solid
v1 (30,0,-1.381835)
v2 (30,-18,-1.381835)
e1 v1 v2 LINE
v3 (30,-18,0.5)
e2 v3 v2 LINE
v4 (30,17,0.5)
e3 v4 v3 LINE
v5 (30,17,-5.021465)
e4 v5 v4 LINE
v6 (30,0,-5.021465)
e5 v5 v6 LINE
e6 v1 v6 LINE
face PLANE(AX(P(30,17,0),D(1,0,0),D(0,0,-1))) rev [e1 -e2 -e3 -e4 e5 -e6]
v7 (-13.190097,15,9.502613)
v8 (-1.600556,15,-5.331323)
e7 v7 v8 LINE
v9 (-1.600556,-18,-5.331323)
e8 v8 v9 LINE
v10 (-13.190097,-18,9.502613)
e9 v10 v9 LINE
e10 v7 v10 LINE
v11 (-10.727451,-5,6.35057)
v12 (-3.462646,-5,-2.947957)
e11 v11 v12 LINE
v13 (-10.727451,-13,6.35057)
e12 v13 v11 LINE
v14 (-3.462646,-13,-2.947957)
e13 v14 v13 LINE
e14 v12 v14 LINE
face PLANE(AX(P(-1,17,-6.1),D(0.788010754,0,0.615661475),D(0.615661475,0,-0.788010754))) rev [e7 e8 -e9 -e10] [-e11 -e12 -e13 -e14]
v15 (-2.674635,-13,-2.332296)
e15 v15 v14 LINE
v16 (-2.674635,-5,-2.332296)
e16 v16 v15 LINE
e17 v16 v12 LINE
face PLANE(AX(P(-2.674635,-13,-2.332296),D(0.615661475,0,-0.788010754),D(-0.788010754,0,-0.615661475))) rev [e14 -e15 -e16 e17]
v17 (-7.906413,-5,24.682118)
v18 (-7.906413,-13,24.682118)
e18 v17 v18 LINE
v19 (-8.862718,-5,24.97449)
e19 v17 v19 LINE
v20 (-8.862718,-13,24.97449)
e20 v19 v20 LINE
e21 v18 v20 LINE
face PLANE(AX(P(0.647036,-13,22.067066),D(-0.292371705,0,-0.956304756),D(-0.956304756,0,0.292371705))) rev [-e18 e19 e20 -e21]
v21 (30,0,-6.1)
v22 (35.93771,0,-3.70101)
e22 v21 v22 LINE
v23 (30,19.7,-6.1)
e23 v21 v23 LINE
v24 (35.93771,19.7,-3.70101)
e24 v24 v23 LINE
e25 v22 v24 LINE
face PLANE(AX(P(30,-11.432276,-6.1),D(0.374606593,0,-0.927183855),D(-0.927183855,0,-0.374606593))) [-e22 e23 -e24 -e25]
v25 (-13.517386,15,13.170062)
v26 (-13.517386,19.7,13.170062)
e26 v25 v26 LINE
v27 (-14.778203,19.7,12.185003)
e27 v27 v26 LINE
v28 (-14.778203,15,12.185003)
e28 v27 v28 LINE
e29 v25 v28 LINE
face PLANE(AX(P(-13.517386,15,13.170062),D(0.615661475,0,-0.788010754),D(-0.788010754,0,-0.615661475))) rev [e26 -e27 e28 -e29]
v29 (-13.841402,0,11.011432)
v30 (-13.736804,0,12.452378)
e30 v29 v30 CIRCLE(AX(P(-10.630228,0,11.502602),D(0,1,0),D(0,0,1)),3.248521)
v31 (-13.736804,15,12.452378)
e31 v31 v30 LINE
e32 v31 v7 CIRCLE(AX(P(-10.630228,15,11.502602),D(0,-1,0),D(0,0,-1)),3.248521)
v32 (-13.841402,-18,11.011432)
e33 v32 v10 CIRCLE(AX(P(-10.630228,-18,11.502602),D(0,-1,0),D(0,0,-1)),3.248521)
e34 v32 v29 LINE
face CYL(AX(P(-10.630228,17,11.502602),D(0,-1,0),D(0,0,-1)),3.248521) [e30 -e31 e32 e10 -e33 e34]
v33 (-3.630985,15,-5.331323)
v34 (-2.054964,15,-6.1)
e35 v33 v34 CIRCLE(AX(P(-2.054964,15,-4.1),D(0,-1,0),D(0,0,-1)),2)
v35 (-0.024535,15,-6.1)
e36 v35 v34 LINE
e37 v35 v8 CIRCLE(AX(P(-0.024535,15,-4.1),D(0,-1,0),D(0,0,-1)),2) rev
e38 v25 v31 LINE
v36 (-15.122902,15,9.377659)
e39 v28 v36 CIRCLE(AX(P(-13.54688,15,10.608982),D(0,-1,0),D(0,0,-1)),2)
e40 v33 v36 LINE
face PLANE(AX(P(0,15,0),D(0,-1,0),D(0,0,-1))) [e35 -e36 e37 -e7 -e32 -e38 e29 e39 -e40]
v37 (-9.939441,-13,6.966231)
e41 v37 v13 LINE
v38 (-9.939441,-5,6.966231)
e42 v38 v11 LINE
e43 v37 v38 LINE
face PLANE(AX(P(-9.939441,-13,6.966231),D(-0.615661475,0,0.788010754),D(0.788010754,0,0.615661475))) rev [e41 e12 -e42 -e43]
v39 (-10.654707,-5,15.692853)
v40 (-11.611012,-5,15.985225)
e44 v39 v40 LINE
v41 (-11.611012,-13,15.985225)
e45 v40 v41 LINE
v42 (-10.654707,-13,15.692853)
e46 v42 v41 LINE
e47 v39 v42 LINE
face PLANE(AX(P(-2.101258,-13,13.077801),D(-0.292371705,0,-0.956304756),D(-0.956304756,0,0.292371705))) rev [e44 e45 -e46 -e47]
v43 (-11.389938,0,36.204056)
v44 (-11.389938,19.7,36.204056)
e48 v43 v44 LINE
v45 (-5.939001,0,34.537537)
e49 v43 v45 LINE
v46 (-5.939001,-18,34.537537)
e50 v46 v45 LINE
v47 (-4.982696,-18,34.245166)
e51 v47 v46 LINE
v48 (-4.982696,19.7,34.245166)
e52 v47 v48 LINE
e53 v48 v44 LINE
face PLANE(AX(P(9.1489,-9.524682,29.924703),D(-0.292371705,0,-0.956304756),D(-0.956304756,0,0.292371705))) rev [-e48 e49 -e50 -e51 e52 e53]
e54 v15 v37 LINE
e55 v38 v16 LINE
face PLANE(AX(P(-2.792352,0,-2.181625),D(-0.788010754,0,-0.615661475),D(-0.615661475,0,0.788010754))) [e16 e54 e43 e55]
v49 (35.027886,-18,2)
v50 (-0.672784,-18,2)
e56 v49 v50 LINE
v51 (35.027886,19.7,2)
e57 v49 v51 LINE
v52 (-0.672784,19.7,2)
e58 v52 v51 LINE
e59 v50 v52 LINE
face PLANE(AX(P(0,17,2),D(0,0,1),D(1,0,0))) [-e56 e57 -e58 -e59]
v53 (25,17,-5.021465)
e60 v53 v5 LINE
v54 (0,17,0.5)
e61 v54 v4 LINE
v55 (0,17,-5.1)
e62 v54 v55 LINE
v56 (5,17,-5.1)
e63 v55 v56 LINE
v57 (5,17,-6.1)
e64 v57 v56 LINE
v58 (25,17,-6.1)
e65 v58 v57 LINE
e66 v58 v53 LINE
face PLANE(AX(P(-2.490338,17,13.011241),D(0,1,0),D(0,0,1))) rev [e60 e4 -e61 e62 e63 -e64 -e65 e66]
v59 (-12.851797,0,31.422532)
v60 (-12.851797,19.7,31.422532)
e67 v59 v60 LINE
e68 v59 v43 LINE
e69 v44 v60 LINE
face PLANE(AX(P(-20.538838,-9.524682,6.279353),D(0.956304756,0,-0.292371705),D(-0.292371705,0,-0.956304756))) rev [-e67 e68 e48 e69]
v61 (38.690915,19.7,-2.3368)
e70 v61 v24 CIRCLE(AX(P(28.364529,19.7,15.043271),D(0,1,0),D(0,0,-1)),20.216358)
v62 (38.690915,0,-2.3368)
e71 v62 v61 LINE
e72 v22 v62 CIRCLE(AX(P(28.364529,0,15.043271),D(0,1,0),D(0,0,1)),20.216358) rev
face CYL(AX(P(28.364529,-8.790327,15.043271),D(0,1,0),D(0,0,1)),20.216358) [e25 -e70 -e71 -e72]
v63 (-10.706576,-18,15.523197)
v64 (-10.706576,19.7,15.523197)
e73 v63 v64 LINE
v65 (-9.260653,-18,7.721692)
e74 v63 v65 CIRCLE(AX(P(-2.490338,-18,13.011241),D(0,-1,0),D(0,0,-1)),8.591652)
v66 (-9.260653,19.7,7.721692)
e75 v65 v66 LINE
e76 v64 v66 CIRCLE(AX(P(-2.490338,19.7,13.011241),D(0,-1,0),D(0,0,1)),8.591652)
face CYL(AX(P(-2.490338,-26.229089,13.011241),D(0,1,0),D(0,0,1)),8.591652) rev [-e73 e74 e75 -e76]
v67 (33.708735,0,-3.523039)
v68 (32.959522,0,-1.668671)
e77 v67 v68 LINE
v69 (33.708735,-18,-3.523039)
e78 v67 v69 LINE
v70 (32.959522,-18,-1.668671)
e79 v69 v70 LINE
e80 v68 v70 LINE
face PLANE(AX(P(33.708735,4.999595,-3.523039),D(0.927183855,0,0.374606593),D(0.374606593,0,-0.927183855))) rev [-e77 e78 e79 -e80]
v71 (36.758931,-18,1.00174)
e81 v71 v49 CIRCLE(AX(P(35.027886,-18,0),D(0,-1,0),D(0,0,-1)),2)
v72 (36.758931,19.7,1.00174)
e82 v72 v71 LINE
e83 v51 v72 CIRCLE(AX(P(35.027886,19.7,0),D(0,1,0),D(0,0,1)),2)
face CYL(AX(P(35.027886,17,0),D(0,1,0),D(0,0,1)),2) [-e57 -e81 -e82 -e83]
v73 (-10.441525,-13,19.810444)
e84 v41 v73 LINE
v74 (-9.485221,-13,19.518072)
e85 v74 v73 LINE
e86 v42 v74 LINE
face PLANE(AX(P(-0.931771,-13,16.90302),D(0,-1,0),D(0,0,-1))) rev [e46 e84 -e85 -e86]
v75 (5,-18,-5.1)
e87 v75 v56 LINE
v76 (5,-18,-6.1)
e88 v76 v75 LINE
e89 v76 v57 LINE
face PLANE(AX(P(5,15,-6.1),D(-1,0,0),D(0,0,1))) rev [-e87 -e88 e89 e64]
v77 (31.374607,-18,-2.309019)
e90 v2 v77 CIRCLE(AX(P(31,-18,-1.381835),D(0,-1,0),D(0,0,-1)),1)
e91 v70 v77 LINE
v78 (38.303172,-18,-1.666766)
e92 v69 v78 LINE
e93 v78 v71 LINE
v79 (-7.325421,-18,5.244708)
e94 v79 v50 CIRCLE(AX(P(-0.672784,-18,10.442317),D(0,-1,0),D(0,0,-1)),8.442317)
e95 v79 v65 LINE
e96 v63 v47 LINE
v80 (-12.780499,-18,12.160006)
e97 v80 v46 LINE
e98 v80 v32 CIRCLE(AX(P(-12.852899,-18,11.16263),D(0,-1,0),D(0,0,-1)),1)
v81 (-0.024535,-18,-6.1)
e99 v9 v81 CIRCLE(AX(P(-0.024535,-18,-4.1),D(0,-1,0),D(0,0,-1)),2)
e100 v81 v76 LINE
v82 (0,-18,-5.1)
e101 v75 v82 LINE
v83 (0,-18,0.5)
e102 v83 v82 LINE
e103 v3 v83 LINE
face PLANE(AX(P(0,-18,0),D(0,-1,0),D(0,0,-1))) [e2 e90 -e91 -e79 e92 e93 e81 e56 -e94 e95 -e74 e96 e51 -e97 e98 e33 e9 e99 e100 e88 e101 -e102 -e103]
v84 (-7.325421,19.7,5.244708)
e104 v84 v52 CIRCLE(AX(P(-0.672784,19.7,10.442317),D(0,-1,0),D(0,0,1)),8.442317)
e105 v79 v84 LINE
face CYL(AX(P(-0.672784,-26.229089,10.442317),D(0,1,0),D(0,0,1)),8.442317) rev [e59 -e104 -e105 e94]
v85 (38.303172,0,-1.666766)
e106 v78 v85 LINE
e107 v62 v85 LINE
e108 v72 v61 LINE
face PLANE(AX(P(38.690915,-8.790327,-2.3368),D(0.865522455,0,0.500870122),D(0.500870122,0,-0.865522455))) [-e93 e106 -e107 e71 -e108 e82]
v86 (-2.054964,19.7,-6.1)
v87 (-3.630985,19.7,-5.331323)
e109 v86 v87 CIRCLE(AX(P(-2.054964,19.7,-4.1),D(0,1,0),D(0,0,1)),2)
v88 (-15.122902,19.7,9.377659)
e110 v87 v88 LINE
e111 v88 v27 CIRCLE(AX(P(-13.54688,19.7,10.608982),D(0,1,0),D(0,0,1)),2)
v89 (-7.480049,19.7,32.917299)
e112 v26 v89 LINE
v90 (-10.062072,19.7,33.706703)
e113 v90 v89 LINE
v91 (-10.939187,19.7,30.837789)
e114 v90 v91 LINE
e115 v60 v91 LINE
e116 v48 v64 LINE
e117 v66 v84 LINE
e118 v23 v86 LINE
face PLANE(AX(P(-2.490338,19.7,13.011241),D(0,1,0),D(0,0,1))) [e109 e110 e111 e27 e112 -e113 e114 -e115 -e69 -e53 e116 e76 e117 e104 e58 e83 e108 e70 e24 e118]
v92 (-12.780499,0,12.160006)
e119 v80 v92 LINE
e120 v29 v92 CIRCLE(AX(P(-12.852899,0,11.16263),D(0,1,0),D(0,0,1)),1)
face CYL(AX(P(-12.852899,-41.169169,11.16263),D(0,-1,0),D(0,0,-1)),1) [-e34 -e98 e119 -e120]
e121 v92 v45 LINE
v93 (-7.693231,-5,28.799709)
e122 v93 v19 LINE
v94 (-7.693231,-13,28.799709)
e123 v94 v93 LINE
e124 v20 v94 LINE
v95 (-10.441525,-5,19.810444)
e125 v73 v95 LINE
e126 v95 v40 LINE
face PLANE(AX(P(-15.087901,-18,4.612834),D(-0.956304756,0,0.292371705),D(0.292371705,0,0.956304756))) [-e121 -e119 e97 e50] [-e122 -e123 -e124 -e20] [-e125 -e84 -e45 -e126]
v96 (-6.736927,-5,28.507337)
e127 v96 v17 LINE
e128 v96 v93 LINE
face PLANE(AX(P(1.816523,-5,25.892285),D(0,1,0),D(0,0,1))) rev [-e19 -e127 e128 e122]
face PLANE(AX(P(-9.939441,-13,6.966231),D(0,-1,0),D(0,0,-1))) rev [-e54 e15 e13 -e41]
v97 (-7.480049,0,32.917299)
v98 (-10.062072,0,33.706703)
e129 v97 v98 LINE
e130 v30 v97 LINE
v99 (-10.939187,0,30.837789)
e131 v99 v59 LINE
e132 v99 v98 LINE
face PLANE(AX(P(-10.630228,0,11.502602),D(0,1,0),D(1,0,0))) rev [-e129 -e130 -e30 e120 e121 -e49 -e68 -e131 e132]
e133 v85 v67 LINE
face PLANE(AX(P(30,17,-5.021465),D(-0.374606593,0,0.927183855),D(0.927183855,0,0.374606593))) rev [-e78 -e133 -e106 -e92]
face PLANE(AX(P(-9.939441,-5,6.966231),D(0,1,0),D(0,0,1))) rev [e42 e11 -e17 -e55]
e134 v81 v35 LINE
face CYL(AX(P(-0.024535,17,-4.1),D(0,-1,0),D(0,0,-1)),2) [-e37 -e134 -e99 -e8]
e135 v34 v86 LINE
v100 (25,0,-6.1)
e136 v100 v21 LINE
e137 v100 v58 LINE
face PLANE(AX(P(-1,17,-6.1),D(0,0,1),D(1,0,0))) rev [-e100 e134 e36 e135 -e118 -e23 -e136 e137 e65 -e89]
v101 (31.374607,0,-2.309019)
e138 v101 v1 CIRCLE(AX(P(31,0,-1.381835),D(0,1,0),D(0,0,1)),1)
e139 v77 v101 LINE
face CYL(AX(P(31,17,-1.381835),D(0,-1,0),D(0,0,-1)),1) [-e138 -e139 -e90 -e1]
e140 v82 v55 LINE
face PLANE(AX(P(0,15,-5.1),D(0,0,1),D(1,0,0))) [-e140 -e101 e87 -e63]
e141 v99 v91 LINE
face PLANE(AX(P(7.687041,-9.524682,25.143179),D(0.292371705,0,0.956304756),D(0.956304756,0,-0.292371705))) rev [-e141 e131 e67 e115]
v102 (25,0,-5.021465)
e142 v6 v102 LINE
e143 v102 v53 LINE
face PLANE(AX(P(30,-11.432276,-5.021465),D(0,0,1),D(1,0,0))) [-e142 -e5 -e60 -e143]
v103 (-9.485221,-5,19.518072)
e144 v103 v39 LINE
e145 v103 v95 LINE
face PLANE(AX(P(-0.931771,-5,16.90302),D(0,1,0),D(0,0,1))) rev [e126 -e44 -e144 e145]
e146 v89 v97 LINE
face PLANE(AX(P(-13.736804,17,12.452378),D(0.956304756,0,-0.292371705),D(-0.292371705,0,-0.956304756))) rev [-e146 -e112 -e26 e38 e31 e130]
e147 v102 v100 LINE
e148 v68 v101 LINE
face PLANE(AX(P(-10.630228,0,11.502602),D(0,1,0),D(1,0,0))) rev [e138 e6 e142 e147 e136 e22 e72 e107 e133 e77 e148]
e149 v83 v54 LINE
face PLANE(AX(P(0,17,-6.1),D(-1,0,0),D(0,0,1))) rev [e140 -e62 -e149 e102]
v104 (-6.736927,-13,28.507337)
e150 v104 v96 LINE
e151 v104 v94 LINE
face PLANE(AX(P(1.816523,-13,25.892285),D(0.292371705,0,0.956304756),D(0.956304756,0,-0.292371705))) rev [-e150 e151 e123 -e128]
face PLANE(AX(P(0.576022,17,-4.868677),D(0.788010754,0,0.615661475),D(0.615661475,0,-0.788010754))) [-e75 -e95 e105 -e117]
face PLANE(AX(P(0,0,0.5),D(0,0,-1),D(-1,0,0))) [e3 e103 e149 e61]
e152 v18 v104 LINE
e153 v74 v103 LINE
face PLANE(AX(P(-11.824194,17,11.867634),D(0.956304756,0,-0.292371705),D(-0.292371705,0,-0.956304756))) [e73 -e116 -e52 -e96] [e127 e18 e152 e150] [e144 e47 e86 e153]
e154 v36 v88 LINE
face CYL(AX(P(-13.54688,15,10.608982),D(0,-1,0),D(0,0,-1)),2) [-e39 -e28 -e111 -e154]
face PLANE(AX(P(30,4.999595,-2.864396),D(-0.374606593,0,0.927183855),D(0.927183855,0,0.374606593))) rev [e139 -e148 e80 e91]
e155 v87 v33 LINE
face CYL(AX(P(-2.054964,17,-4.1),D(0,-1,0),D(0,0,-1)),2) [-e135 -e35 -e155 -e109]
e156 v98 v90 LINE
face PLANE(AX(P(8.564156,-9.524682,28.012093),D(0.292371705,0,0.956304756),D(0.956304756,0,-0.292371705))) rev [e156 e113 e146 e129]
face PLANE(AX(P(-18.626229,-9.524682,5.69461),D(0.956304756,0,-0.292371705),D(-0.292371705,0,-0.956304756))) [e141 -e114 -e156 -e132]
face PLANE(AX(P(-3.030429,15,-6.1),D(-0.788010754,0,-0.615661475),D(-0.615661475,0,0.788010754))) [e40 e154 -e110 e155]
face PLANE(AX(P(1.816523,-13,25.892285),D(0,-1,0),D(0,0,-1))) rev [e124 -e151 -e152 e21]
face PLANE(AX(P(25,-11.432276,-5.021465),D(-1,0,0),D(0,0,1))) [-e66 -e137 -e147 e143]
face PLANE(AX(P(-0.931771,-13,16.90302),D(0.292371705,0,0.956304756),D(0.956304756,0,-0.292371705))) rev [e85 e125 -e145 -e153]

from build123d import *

# Parameters (mm, degrees)
EXTRUDE_THIN1_DEPTH  = 17
BOSS_EXTRUDE1_DEPTH  = 17
BOSS_EXTRUDE3_START  = 18
BOSS_EXTRUDE3_DEPTH  = 18
BOSS_EXTRUDE10_START = 18
BOSS_EXTRUDE10_DEPTH = 18
SKETCH6_W            = 4
SKETCH6_H            = 8
CUT_EXTRUDE1_DEPTH   = 1
BOSS_EXTRUDE4_DEPTH  = 18
CUT_EXTRUDE3_START   = -18
CUT_EXTRUDE3_DEPTH   = 18
BOSS_EXTRUDE5_DEPTH  = 17
BOSS_EXTRUDE6_DEPTH  = 2
SKETCH12_W           = 5
SKETCH12_H           = 1
BOSS_EXTRUDE8_DEPTH  = 33
SKETCH15_W           = 11.8
SKETCH15_H           = 8
CUT_EXTRUDE4_DEPTH   = 1
FILLET1_R            = 2
SKETCH16_W           = 30
SKETCH16_H           = 2
BOSS_EXTRUDE11_DEPTH = 18
BOSS_EXTRUDE12_START = -35
BOSS_EXTRUDE12_DEPTH = 35
SKETCH18_W           = 30
SKETCH18_H           = 35
CUT_EXTRUDE5_DEPTH   = 0.5
BOSS_EXTRUDE13_DEPTH = 2.7
BOSS_EXTRUDE14_START = -19.7
BOSS_EXTRUDE14_DEPTH = 19.7
SKETCH22_W           = 1
SKETCH22_H           = 18
BOSS_EXTRUDE15_DEPTH = 2
BOSS_EXTRUDE16_DEPTH = 19.7
BOSS_EXTRUDE17_DEPTH = 18
FILLET2_R            = 1
FILLET3_R            = 1
FILLET4_R            = 2
FILLET5_R            = 2
FILLET6_R            = 2


# Read off the part's stored shape, not the designer's step: Extrude-Thin1
with BuildPart() as part:
    # Extrude-Thin1 outline → Extrude-Thin1 (new body)
    with BuildSketch(Plane(origin=(0, 0, 0), x_dir=(1, 0, 0), z_dir=(0, 1, 0))):
        with BuildLine():
            Line((-13.736803788, -12.452377644), (-7.480049307, -32.917299422))
            Line((-7.480049307, -32.917299422), (-5.567439795, -32.332556012))
            Line((-5.567439795, -32.332556012), (-11.824194276, -11.867634235))
            ThreePointArc((-11.824194276, -11.867634235), (-11.857842102, -11.27507721), (-11.614075704, -10.733935872))
            Line((-11.614075704, -10.733935872), (-2, 1.571519877))
            Line((-2, 1.571519877), (-2, -2))
            Line((-2, -2), (32, -2))
            Line((32, -2), (32, 2.05634332))
            Line((32, 2.05634332), (34.813889941, 0.919457988))
            Line((34.813889941, 0.919457988), (35.563103127, 2.773825697))
            Line((35.563103127, 2.773825697), (30, 5.021465257))
            Line((30, 5.021465257), (30, 0))
            Line((30, 0), (0, 0))
            Line((0, 0), (0, 6.1))
            Line((0, 6.1), (-1, 6.1))
            Line((-1, 6.1), (-13.190097211, -9.502612921))
            ThreePointArc((-13.190097211, -9.502612921), (-13.824351917, -10.910606158), (-13.736803788, -12.452377644))
        make_face()
    extrude(amount=EXTRUDE_THIN1_DEPTH)

    # Sketch2 → Boss-Extrude1 (add)
    with BuildSketch(Plane(origin=(0, 17, 0), x_dir=(1, 0, 0), z_dir=(0, 1, 0))):
        Polygon((32, -2), (32, 2.05634332), (34.813889941, 0.919457988), align=None)
        Polygon((-2, -2), (-2, 1.571519877), (-5.158478254, -2.471147935), align=None)
    extrude(amount=-BOSS_EXTRUDE1_DEPTH)

    # Sketch5 → Boss-Extrude3 (add)
    with BuildSketch(Plane.XZ.offset(BOSS_EXTRUDE3_START)):
        with BuildLine():
            Line((-2, 2), (-5.158478254, 2.471147935))
            Line((-5.158478254, 2.471147935), (-11.614075704, 10.733935872))
            ThreePointArc((-11.614075704, 10.733935872), (-11.857842102, 11.27507721), (-11.824194276, 11.867634235))
            Line((-11.824194276, 11.867634235), (-5.567439795, 32.332556012))
            Line((-5.567439795, 32.332556012), (-6.523744551, 32.624927717))
            Line((-6.523744551, 32.624927717), (-12.780499032, 12.160005939))
            ThreePointArc((-12.780499032, 12.160005939), (-12.84109701, 11.092841684), (-12.402086458, 10.118274397))
            Line((-12.402086458, 10.118274397), (0, -5.755672387))
            Line((0, -5.755672387), (0, 2))
            Line((0, 2), (-2, 2))
        make_face()
    extrude(amount=-BOSS_EXTRUDE3_DEPTH)

    # Sketch14 → Boss-Extrude10 (add)
    with BuildSketch(Plane.XZ.offset(BOSS_EXTRUDE10_START)):
        with BuildLine():
            Line((0, -6.1), (-1, -6.1))
            Line((-1, -6.1), (-13.190097211, 9.502612921))
            ThreePointArc((-13.190097211, 9.502612921), (-13.824351917, 10.910606159), (-13.736803788, 12.452377644))
            Line((-13.736803788, 12.452377644), (-12.780499032, 12.160005939))
            ThreePointArc((-12.780499032, 12.160005939), (-12.84109701, 11.092841684), (-12.402086458, 10.118274397))
            Line((-12.402086458, 10.118274397), (0, -5.755672387))
            Line((0, -5.755672387), (0, -6.1))
        make_face()
    extrude(amount=-BOSS_EXTRUDE10_DEPTH)

    # Sketch6 → Cut-Extrude1 (cut)
    with BuildSketch(Plane(origin=(-15.087900976, 0, 4.612834247), x_dir=(0.2923717047227341, 0, 0.9563047559630363), z_dir=(-0.9563047559630363, 0, 0.2923717047227341))):
        with Locations((23.292015223, -9)):
            Rectangle(SKETCH6_W, SKETCH6_H)
        with Locations((13.892015223, -9)):
            Rectangle(SKETCH6_W, SKETCH6_H)
    extrude(amount=-CUT_EXTRUDE1_DEPTH, mode=Mode.SUBTRACT)

    # Sketch8 → Boss-Extrude4 (add)
    with BuildSketch(Plane.XZ):
        Polygon((30, -5.021465257), (35.563103127, -2.773825697), (34.813889941, -0.919457988), (32, 2), (30, 2), align=None)
    extrude(amount=BOSS_EXTRUDE4_DEPTH)

    # Sketch9 → Cut-Extrude3 (cut)
    with BuildSketch(Plane.XZ.offset(18).offset(CUT_EXTRUDE3_START)):
        Polygon((30, -5.021465257), (33.708735418, -3.523038884), (32.959522231, -1.668671175), (30, -2.864395772), align=None)
    extrude(amount=CUT_EXTRUDE3_DEPTH, mode=Mode.SUBTRACT)

    # Sketch10 → Boss-Extrude5 (add)
    with BuildSketch(Plane(origin=(0, 17, 0), x_dir=(1, 0, 0), z_dir=(0, 1, 0))):
        Polygon((30, 5.021465257), (25, 5.021465257), (25, 6.1), (30, 6.1), (35.937709721, 3.701009551), (35.563103127, 2.773825697), align=None)
    extrude(amount=-BOSS_EXTRUDE5_DEPTH)

    # Sketch4 → Boss-Extrude6 (add)
    with BuildSketch(Plane.XZ.offset(-17)):
        Polygon((0, 2), (0, -5.1), (5, -5.1), (5, -6.1), (0, -6.1), (-3.030429144, -6.1), (-16.354224478, 10.953680347), (-13.517385765, 13.170061658), (-11.614075704, 10.733935872), (-5.158478254, 2.471147935), (-2, 2), align=None)
    extrude(amount=BOSS_EXTRUDE6_DEPTH)

    # Sketch12 → Boss-Extrude8 (add)
    with BuildSketch(Plane.XZ.offset(-15)):
        with Locations((2.5, -5.6)):
            Rectangle(SKETCH12_W, SKETCH12_H)
    extrude(amount=BOSS_EXTRUDE8_DEPTH)

    # Sketch15 → Cut-Extrude4 (cut)
    with BuildSketch(Plane(origin=(-3.580362913, 0, -2.797286082), x_dir=(-0.6156614753256621, 0, 0.7880107536067191), z_dir=(-0.788010753606719, 0, -0.615661475325662))):
        with Locations((5.708795878, -9)):
            Rectangle(SKETCH15_W, SKETCH15_H)
    extrude(amount=-CUT_EXTRUDE4_DEPTH, mode=Mode.SUBTRACT)

    # Fillet1
    fillet1_edges = [part.edges().sort_by_distance(p)[0] for p in [
        (-1, -9, -6.1),
    ]]
    fillet(fillet1_edges, radius=FILLET1_R)

    # Sketch16 → Boss-Extrude11 (add)
    with BuildSketch(Plane.XZ):
        with Locations((15, 1)):
            Rectangle(SKETCH16_W, SKETCH16_H)
    extrude(amount=BOSS_EXTRUDE11_DEPTH)

    # Sketch17 → Boss-Extrude12 (add)
    with BuildSketch(Plane(origin=(0, 17, 0), x_dir=(1, 0, 0), z_dir=(0, 1, 0)).offset(BOSS_EXTRUDE12_START)):
        with BuildLine():
            Line((-0.672783951, -2), (-2, -2))
            Line((-2, -2), (-5.158478254, -2.471147935))
            Line((-5.158478254, -2.471147935), (-7.325420645, -5.244707716))
            ThreePointArc((-7.325420645, -5.244707716), (-4.373652198, -2.854412758), (-0.672783951, -2))
        make_face()
        with BuildLine():
            Line((-11.824194276, -11.867634235), (-10.706576434, -15.523197479))
            ThreePointArc((-10.706576434, -15.523197479), (-10.93812277, -11.445537112), (-9.260652859, -7.721691994))
            Line((-9.260652859, -7.721691994), (-11.614075704, -10.733935872))
            ThreePointArc((-11.614075704, -10.733935872), (-11.857842102, -11.27507721), (-11.824194276, -11.867634235))
        make_face()
    extrude(amount=BOSS_EXTRUDE12_DEPTH)

    # Sketch18 → Cut-Extrude5 (cut)
    with BuildSketch(Plane(origin=(0, 0, 0), x_dir=(-1, 0, 0), z_dir=(0, 0, -1))):
        with Locations((-15, -0.5)):
            Rectangle(SKETCH18_W, SKETCH18_H)
    extrude(amount=-CUT_EXTRUDE5_DEPTH, mode=Mode.SUBTRACT)

    # Sketch19 → Boss-Extrude13 (add)
    with BuildSketch(Plane(origin=(0, 17, 0), x_dir=(1, 0, 0), z_dir=(0, 1, 0))):
        with BuildLine():
            Line((5, 6.1), (25, 6.1))
            Line((25, 6.1), (30, 6.1))
            Line((30, 6.1), (35.937709721, 3.701009551))
            Line((35.937709721, 3.701009551), (34.813889941, 0.919457988))
            Line((34.813889941, 0.919457988), (32, -2))
            Line((32, -2), (-0.672783951, -2))
            ThreePointArc((-0.672783951, -2), (-4.373652198, -2.854412758), (-7.325420645, -5.244707716))
            Line((-7.325420645, -5.244707716), (-9.260652859, -7.721691994))
            ThreePointArc((-9.260652859, -7.721691994), (-10.93812277, -11.445537112), (-10.706576434, -15.523197479))
            Line((-10.706576434, -15.523197479), (-5.567439795, -32.332556012))
            Line((-5.567439795, -32.332556012), (-7.480049307, -32.917299422))
            Line((-7.480049307, -32.917299422), (-13.517385765, -13.170061658))
            Line((-13.517385765, -13.170061658), (-16.354224478, -10.953680347))
            Line((-16.354224478, -10.953680347), (-3.030429144, 6.1))
            Line((-3.030429144, 6.1), (5, 6.1))
        make_face()
    extrude(amount=BOSS_EXTRUDE13_DEPTH)

    # Sketch21 → Boss-Extrude14 (add)
    with BuildSketch(Plane(origin=(0, 19.7, 0), x_dir=(1, 0, 0), z_dir=(0, 1, 0)).offset(BOSS_EXTRUDE14_START)):
        Polygon((-4.982696385, -34.245165524), (-5.567439795, -32.332556012), (-10.062072148, -33.706703024), (-10.939187262, -30.837788757), (-12.851796774, -31.422532166), (-11.38993825, -36.204055946), align=None)
    extrude(amount=BOSS_EXTRUDE14_DEPTH)

    # Sketch22 → Boss-Extrude15 (add)
    with BuildSketch(Plane(origin=(8.564156426, 0, 28.01209347), x_dir=(0.9563047559630371, 0, -0.2923717047227314), z_dir=(0.2923717047227314, 0, 0.9563047559630371))):
        with Locations((-15.277293674, -9)):
            Rectangle(SKETCH22_W, SKETCH22_H)
    extrude(amount=BOSS_EXTRUDE15_DEPTH)

    # Sketch23 → Boss-Extrude16 (add)
    with BuildSketch(Plane(origin=(0, 19.7, 0), x_dir=(1, 0, 0), z_dir=(0, 1, 0))):
        with BuildLine():
            Line((34.813889941, 0.919457988), (35.937709721, 3.701009551))
            ThreePointArc((35.937709721, 3.701009551), (37.340267778, 3.071287576), (38.690914739, 2.336800231))
            Line((38.690914739, 2.336800231), (36.18124714, -2))
            Line((36.18124714, -2), (32, -2))
            Line((32, -2), (34.813889941, 0.919457988))
        make_face()
    extrude(amount=-BOSS_EXTRUDE16_DEPTH)

    # Sketch24 → Boss-Extrude17 (add)
    with BuildSketch(Plane.XZ):
        Polygon((36.18124714, 2), (32, 2), (34.813889941, -0.919457988), (35.563103127, -2.773825697), (38.303171931, -1.66676604), align=None)
    extrude(amount=BOSS_EXTRUDE17_DEPTH)

    # Fillet2
    fillet2_edges = [part.edges().sort_by_distance(p)[0] for p in [
        (30, -9, -2.864395772),
    ]]
    fillet(fillet2_edges, radius=FILLET2_R)

    # Fillet3
    # the kernel refuses this fillet: 1 mm, written as the material it takes off along each edge
    with BuildSketch(Plane(origin=(-13.736803788, -21.611842033, 12.452377644), x_dir=(0.956304755965878, 0, -0.29237170471343904), z_dir=(0, 1, 0))) as fillet3_piece_1:
        with BuildLine():
            CenterArc((1.222368407, 0.974962713), FILLET3_R, 154.303641792, 102.848179104)
            Line((0.321263823, 1.408564523), (0.303241732, 1.417236559))
            ThreePointArc((0.303241732, 1.417236559), (0.061834895, 0.726815775), (-0.02, 0))
            Line((-0.02, 0), (0, -0.02))
            ThreePointArc((0, -0.02), (0.5, -0.02), (0.995552632, -0.019499254))
            Line((0.995552632, -0.019499254), (1, 0))
        make_face()
    extrude(amount=21.611842033, mode=Mode.SUBTRACT)

    # Fillet4
    fillet4_edges = [part.edges().sort_by_distance(p)[0] for p in [
        (-16.354224478, 17.35, 10.953680347),
    ]]
    fillet(fillet4_edges, radius=FILLET4_R)

    # Fillet5
    fillet5_edges = [part.edges().sort_by_distance(p)[0] for p in [
        (-3.030429144, 17.35, -6.1),
    ]]
    fillet(fillet5_edges, radius=FILLET5_R)

    # Fillet6
    fillet6_edges = [part.edges().sort_by_distance(p)[0] for p in [
        (36.18124714, 0.85, 2),
    ]]
    fillet(fillet6_edges, radius=FILLET6_R)


solid = part.part
